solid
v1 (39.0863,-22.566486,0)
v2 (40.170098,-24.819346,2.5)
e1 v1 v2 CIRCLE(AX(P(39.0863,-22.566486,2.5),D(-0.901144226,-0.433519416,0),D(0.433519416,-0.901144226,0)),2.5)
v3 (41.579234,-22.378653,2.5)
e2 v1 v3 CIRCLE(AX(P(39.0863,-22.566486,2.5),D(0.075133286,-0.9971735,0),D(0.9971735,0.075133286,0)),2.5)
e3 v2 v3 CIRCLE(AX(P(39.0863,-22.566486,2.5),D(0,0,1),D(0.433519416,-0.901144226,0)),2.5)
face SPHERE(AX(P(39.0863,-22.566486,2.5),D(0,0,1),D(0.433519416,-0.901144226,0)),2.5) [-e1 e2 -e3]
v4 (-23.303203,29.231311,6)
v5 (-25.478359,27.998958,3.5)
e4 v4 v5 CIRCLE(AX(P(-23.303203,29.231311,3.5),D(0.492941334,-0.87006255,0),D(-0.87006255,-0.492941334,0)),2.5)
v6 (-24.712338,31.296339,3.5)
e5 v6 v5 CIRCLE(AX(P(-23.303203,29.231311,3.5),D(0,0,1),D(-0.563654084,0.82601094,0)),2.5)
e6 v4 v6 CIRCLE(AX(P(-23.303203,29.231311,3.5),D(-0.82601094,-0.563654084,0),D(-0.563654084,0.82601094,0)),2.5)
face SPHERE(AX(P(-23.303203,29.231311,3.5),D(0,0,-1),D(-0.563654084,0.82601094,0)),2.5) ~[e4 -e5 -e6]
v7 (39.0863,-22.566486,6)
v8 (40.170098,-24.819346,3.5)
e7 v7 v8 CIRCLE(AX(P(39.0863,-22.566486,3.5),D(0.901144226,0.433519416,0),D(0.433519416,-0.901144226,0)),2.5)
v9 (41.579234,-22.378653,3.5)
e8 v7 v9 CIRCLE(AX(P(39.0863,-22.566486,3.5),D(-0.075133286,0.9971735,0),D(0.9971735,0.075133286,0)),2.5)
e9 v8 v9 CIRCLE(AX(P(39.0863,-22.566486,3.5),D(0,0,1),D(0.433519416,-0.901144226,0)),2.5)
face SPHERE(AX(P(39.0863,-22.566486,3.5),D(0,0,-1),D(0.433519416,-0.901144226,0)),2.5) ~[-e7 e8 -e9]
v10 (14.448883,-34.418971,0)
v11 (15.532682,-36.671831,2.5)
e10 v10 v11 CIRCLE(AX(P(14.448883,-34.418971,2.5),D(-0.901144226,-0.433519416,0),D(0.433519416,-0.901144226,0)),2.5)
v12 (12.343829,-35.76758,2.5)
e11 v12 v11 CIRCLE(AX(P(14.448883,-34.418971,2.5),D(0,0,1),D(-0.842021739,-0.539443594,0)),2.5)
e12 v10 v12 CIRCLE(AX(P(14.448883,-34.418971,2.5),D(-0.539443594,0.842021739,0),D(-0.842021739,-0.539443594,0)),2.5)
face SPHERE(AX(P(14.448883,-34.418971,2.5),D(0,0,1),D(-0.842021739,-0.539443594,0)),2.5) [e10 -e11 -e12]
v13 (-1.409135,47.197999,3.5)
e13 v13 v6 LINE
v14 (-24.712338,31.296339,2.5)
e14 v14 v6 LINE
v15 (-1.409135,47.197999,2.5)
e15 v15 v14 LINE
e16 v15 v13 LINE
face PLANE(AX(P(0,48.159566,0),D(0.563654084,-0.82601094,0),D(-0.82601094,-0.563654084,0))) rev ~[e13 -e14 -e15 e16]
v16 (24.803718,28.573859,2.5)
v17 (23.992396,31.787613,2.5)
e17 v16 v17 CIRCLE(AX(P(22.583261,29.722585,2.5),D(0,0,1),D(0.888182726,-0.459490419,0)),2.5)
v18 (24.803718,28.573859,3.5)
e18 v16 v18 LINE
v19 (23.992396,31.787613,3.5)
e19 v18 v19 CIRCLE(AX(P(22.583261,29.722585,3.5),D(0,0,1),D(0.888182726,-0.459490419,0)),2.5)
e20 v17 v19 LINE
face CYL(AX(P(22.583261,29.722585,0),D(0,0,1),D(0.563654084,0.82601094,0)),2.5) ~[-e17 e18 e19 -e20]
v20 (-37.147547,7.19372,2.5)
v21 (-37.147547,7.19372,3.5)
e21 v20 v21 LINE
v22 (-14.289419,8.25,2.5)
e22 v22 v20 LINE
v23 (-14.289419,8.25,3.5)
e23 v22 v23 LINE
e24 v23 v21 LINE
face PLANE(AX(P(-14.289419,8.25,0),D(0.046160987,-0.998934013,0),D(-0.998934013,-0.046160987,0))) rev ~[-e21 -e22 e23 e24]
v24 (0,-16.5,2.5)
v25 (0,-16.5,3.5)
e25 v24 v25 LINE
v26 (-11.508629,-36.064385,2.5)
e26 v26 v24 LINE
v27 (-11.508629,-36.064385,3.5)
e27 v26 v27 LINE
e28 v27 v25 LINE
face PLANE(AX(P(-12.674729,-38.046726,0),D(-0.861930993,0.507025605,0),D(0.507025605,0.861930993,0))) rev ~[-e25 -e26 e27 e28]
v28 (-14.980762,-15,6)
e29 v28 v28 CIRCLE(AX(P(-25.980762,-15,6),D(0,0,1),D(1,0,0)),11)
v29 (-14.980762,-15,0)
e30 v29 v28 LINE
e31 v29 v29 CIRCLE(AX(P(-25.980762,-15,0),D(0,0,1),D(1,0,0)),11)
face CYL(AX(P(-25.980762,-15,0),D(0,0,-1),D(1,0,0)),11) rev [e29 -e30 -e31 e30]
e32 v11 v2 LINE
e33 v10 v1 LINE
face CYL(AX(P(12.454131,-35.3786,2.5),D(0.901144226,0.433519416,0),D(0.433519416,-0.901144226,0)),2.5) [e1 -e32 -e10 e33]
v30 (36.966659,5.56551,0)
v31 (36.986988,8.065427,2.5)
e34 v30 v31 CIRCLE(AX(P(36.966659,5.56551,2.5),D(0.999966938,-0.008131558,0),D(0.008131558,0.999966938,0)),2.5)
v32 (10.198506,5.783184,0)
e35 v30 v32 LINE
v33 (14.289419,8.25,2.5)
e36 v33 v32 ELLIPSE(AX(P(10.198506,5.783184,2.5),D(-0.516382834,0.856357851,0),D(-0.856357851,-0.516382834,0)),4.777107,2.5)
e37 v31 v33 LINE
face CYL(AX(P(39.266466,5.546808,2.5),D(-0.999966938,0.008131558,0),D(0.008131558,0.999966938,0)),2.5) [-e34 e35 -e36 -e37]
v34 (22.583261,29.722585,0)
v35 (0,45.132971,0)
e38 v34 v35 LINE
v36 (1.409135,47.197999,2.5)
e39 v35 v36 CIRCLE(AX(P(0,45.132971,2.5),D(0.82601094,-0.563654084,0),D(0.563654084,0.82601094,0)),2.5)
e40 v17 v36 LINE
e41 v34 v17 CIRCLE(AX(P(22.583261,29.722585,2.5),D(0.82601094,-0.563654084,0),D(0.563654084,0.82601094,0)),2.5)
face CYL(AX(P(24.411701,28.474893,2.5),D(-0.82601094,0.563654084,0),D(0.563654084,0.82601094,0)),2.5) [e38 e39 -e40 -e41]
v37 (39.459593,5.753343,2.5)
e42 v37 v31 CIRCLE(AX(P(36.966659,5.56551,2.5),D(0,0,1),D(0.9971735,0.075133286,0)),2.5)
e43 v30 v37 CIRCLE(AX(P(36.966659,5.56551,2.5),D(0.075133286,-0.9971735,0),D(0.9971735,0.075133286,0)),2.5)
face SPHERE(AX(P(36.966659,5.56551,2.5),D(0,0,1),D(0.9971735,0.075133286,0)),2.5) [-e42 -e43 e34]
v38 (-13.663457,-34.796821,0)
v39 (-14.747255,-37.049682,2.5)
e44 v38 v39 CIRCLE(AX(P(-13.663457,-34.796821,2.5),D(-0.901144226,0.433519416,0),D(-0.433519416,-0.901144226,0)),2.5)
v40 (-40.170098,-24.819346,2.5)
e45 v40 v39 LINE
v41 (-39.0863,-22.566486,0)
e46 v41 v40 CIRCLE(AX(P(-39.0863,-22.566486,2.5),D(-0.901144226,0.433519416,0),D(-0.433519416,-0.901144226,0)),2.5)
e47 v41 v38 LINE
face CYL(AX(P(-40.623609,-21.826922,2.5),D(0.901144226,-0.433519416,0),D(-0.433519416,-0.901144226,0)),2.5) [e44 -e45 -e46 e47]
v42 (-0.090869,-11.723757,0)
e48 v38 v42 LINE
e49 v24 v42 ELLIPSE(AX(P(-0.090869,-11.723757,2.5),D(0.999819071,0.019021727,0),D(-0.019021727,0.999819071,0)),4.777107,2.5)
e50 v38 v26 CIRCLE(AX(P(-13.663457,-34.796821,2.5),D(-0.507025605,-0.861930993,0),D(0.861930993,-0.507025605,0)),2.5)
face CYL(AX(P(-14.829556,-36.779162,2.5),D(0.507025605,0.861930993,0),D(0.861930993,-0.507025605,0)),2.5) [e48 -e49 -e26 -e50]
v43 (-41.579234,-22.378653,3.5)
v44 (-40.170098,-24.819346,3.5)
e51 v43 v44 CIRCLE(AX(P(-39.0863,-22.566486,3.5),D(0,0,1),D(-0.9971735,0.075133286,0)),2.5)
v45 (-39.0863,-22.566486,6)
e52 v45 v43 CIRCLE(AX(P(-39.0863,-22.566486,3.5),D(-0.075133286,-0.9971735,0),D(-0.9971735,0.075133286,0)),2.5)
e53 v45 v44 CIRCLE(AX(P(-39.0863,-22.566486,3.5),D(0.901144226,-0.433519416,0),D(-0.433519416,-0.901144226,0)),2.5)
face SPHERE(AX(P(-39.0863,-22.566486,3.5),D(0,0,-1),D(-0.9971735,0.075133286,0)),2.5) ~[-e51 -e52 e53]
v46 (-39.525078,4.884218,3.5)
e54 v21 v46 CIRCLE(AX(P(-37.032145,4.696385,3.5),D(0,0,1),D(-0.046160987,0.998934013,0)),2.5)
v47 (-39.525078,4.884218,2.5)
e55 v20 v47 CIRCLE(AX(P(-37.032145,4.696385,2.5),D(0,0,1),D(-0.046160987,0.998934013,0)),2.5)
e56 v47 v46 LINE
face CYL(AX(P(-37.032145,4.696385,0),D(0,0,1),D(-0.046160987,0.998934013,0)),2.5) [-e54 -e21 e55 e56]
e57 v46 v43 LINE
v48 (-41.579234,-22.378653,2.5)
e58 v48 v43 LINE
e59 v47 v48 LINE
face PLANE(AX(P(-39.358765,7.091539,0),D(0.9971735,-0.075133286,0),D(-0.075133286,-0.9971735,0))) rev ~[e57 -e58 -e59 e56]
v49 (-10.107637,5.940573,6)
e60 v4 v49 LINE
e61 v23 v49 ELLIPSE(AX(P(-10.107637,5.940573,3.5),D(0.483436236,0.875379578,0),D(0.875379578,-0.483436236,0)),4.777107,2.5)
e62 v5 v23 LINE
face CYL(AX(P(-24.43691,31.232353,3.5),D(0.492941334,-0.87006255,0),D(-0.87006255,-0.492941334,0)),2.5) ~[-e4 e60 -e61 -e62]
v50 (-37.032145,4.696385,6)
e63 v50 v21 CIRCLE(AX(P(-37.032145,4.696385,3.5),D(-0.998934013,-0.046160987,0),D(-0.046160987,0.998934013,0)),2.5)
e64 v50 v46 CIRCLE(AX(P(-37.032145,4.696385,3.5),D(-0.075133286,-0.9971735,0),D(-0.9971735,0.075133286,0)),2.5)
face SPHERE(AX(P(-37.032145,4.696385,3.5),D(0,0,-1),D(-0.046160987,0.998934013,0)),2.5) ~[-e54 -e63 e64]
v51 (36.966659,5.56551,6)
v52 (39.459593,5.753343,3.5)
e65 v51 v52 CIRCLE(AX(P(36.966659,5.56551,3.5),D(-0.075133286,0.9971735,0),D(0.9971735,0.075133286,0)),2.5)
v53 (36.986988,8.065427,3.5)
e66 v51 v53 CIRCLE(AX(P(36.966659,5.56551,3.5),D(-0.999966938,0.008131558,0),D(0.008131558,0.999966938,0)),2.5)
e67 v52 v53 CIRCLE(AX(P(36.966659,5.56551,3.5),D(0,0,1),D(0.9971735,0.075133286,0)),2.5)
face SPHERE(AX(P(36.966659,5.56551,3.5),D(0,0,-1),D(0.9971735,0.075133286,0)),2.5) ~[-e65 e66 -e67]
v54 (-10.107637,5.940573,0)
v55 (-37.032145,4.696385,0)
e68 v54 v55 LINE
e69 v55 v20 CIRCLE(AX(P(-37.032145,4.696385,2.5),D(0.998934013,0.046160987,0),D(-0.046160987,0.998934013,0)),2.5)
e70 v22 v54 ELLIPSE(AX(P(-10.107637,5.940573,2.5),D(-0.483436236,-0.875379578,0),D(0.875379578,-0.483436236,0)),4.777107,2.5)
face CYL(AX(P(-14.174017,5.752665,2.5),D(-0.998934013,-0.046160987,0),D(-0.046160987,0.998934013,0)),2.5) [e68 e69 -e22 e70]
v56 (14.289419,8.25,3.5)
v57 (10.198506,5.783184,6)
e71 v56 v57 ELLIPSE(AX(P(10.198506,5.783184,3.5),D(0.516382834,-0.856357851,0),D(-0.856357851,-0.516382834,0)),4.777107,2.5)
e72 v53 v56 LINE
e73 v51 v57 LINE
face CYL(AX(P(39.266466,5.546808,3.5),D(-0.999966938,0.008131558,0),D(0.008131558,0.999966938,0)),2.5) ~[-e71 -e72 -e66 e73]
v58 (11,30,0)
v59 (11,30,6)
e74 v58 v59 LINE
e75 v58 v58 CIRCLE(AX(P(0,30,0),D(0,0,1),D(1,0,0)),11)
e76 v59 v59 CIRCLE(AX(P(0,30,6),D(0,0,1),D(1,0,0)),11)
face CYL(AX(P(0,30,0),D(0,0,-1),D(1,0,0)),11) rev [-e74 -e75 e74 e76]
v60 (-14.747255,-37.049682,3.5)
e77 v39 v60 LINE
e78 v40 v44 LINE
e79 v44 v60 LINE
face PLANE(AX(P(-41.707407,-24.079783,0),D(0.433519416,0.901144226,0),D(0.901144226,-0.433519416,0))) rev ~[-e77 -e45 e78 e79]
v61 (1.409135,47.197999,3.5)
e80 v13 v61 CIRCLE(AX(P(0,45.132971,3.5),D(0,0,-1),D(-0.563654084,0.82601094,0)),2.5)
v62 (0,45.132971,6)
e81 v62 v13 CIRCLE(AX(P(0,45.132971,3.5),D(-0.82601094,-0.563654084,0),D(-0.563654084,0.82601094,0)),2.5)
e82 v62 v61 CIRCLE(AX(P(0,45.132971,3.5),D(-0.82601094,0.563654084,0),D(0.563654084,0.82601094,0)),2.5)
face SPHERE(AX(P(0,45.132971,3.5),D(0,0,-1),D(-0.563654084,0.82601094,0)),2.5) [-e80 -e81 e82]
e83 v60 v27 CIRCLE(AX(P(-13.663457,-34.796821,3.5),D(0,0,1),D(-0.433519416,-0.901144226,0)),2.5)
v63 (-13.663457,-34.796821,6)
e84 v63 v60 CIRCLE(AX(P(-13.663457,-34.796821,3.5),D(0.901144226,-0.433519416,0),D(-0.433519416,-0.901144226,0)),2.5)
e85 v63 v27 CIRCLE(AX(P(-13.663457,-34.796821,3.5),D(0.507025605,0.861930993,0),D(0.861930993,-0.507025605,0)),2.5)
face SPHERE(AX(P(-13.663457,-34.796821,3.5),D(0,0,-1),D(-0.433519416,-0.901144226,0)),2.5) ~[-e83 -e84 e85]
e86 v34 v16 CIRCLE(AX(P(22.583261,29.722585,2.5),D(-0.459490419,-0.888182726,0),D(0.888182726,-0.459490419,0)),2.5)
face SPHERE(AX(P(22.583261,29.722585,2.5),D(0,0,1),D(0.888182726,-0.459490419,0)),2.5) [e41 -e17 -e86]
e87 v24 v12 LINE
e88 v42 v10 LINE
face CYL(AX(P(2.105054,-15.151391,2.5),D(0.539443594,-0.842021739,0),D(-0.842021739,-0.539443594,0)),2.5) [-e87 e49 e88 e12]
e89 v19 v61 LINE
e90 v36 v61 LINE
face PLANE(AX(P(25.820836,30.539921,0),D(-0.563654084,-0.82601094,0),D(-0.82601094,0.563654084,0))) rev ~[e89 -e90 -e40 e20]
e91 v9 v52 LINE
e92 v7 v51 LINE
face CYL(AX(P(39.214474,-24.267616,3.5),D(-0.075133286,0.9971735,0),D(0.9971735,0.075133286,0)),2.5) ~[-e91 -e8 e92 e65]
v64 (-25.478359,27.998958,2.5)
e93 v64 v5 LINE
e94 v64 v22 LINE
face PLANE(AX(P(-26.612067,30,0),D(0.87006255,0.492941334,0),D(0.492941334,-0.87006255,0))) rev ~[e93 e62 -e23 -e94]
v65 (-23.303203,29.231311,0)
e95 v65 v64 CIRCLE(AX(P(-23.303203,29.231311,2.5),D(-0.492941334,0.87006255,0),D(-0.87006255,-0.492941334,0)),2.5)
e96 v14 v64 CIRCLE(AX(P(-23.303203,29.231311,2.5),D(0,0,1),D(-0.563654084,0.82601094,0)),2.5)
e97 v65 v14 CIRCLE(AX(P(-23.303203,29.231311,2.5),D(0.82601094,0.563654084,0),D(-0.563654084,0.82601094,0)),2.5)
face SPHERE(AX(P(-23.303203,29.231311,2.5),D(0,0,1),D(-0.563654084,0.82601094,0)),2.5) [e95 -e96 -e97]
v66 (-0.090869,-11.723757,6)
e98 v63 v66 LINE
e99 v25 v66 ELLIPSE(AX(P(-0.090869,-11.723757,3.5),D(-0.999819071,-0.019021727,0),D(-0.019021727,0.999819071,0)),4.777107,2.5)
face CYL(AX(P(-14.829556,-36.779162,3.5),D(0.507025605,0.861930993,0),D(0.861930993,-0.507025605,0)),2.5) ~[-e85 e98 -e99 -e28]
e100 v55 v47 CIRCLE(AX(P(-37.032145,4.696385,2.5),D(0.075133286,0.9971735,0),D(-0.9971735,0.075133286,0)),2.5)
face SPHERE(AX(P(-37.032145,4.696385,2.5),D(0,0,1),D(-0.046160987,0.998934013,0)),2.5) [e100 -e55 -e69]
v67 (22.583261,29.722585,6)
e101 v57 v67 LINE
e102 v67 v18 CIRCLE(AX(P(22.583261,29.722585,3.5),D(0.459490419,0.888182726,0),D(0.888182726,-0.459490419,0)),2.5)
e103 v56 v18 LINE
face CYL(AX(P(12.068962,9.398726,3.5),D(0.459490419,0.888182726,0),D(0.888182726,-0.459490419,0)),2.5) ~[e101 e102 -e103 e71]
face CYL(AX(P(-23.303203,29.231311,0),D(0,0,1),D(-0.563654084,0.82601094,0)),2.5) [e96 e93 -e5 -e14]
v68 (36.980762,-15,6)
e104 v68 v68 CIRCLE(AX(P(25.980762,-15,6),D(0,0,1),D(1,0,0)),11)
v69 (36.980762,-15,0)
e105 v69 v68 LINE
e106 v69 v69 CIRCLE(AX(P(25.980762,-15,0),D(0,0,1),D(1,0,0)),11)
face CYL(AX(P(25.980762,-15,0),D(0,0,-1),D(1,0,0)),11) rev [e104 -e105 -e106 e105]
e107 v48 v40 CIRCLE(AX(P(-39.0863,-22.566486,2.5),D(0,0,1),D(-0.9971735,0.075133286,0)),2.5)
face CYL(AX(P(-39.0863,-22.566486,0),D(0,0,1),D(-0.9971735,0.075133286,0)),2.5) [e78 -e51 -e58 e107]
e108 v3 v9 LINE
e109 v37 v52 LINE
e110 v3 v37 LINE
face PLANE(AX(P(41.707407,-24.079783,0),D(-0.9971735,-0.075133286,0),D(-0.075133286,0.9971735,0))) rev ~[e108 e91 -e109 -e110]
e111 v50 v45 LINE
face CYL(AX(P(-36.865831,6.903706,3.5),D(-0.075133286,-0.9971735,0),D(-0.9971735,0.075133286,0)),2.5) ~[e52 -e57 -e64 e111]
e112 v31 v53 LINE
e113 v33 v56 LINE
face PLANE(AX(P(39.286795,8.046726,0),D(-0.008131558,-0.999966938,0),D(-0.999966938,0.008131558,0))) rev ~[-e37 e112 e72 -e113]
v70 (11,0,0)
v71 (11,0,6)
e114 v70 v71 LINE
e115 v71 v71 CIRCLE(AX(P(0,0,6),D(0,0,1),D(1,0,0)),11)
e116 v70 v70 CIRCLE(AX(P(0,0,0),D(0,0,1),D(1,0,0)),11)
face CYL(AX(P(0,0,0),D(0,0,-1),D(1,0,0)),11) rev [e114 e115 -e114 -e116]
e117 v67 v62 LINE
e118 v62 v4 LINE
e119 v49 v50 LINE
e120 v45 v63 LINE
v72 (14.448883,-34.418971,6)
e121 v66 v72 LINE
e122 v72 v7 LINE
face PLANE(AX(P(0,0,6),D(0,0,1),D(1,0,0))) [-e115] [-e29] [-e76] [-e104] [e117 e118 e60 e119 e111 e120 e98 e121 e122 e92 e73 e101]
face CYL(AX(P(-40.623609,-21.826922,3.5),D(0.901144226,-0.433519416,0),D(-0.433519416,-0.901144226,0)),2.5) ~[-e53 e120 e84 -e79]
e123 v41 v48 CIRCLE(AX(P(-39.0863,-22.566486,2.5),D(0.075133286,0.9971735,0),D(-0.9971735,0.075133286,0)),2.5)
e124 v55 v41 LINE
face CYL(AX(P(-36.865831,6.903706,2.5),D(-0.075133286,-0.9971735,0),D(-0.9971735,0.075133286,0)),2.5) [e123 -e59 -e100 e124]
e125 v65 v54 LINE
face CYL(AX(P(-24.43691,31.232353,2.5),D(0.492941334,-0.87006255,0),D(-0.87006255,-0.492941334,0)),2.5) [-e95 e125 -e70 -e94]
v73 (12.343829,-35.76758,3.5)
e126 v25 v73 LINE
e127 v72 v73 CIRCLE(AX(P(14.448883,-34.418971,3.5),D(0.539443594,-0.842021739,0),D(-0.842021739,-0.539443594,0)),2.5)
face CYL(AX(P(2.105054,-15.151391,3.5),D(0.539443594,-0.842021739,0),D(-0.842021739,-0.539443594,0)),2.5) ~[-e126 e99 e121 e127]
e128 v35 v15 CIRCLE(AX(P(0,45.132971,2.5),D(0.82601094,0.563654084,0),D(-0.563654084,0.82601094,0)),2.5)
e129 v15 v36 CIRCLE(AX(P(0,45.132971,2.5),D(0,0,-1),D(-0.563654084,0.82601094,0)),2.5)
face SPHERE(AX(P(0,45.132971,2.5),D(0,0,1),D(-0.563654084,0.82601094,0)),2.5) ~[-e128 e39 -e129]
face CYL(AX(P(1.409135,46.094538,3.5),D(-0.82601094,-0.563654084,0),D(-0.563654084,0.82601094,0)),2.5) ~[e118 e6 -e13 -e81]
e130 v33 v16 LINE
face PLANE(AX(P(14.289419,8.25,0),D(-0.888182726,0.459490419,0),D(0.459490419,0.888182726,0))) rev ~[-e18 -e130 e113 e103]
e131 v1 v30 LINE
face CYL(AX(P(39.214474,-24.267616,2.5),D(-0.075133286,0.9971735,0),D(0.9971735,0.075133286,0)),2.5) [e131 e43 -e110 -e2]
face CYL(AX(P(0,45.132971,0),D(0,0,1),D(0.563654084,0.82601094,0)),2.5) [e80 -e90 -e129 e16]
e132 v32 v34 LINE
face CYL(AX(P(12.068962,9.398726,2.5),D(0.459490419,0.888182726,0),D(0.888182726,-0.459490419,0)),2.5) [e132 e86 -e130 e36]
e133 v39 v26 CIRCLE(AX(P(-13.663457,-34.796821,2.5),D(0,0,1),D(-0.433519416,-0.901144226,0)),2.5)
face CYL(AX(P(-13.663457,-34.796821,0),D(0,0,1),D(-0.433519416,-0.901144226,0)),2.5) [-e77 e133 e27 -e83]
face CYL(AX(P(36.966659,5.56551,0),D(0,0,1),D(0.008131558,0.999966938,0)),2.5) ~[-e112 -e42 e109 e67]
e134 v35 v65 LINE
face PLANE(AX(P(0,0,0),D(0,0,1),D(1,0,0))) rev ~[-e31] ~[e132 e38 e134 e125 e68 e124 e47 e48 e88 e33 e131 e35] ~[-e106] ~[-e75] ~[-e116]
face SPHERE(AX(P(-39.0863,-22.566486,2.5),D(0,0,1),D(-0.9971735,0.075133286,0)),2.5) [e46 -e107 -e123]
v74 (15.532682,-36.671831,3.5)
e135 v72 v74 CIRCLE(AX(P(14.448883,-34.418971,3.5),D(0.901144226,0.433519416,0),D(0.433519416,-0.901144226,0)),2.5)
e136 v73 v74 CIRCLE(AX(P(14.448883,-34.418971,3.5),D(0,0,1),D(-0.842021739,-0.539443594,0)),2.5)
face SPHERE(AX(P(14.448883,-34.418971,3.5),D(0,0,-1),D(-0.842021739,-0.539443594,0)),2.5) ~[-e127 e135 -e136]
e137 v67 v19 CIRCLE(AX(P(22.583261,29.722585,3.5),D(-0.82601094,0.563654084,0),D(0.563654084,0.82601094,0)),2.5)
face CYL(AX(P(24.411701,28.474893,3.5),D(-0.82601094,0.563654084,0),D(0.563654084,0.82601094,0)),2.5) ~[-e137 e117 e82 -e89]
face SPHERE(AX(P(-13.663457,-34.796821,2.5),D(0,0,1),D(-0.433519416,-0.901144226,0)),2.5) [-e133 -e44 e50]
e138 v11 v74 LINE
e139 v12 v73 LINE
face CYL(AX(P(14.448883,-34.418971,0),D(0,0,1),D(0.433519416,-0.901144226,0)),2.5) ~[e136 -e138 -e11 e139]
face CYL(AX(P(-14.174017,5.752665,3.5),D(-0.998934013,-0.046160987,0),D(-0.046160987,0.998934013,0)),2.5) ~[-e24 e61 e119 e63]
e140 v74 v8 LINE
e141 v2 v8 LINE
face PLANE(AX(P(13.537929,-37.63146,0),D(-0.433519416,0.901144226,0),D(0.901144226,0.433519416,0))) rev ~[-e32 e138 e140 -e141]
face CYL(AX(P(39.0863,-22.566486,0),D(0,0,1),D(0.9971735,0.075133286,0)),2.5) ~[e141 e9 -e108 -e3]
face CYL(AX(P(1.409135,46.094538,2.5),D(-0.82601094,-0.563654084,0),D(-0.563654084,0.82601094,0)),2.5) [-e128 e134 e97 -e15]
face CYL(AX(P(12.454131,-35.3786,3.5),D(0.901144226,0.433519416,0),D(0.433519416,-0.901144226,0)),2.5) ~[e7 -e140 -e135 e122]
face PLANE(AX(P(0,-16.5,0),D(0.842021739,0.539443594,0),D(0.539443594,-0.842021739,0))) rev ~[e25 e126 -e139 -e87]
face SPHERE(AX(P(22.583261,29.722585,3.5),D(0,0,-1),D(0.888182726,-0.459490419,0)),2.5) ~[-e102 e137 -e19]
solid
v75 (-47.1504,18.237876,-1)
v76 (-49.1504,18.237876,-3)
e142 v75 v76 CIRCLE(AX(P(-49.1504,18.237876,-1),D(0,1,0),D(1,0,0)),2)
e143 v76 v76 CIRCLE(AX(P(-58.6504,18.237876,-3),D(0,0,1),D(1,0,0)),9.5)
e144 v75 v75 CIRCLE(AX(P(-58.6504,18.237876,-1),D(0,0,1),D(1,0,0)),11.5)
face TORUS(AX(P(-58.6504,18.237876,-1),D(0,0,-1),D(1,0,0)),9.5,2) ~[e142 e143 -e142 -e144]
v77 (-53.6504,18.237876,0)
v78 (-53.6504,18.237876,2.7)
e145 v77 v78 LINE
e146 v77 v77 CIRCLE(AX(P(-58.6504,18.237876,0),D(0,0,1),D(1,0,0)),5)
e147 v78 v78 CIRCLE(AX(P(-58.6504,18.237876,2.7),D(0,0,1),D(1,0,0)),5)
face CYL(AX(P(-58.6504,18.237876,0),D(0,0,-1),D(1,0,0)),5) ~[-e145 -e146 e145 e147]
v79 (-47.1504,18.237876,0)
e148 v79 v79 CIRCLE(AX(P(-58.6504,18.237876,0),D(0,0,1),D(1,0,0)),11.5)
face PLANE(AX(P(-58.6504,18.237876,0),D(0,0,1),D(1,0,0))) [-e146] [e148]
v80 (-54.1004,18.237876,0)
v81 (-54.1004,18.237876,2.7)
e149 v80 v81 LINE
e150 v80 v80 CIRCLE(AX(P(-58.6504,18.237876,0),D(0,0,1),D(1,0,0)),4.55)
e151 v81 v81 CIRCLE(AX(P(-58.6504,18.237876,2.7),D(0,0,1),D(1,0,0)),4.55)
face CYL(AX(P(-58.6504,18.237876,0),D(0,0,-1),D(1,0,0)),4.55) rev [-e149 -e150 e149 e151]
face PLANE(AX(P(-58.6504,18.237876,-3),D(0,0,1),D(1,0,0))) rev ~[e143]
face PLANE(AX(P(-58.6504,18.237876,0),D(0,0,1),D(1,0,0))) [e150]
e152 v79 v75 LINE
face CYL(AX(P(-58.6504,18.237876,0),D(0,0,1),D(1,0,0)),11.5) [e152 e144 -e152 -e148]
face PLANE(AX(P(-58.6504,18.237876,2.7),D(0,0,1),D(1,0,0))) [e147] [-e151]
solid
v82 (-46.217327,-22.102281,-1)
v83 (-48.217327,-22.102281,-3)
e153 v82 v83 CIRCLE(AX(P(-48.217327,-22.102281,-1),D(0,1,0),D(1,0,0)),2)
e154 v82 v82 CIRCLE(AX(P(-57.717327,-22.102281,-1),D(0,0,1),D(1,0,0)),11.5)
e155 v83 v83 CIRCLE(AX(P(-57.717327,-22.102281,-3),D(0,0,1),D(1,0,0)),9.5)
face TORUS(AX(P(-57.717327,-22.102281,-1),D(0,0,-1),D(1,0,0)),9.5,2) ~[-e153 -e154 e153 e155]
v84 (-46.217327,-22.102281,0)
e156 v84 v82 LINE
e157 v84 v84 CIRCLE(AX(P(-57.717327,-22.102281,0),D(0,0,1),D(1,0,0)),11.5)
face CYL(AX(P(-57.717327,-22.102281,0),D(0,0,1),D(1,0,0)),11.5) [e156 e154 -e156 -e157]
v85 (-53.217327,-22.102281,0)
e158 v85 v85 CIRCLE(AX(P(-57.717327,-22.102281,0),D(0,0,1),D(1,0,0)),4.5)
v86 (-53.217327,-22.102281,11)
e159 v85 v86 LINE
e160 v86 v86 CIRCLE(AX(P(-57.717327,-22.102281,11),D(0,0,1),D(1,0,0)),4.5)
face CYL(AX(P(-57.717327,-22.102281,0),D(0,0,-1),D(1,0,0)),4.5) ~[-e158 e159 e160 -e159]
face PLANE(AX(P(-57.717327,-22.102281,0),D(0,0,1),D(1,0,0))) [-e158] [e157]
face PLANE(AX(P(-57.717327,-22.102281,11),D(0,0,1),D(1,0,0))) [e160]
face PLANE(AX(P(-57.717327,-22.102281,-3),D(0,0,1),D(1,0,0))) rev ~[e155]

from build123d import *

# Parameters (mm, degrees)
F0_R      = 11
F1_DEPTH  = 6
F2_R      = 2.5
F3_R      = 11.5
F3_R_2    = 4.5
F6_DEPTH  = 3
F7_DEPTH  = 11
F8_DEPTH  = 3
F9_R      = 5
F9_R_2    = 4.55
F10_DEPTH = 3
F9_R_3    = 11.5
F11_DEPTH = 3
F12_DEPTH = 3
F14_R     = 11.5
F14_R_2   = 4.5
F15_DEPTH = 3
F16_DEPTH = 11
F17_R     = 2
F19_R     = 11.5
F19_R_2   = 5
F19_R_3   = 4.55
F20_DEPTH = 3
F21_DEPTH = 2.7
F22_R     = 2


# Not quite as in the source:
# - a feature names something its author has since deleted; it is built from what else it names
# - the program builds the solid bodies; features that only make, move or delete a surface that nothing else refers to are left out


with BuildPart() as f1:
    # F0 (on Top) → F1 (new body)
    with BuildSketch(Plane.XY):
        Polygon((25.8208357735, 30.5399207623), (0, 48.1595657766), (-26.6120665459, 30), (-14.2894191624, 8.25), (-39.3587650965, 7.0915393457), (-41.7074073978, -24.0797828883), (-12.6747288406, -38.0467256759), (0, -16.5), (13.5379293229, -37.631460108), (41.7074073978, -24.0797828883), (39.2867953865, 8.0467256759), (14.2894191624, 8.25), align=None)
        with Locations((-25.9807621135, -15)):
            Circle(F0_R, mode=Mode.SUBTRACT)
        Circle(F0_R, mode=Mode.SUBTRACT)
        with Locations((25.9807621135, -15)):
            Circle(F0_R, mode=Mode.SUBTRACT)
        with Locations((0, 30)):
            Circle(F0_R, mode=Mode.SUBTRACT)
    extrude(amount=F1_DEPTH)

    # F2
    f2_edges = [f1.edges().sort_by_distance(p)[0] for p in [
        (-13.306033, 39.079783, 0),
        (-13.306033, 39.079783, 6),
        (-20.450743, 19.125, 0),
        (-20.450743, 19.125, 6),
        (-26.824092, 7.67077, 0),
        (-26.824092, 7.67077, 6),
        (-40.533086, -8.494122, 0),
        (-40.533086, -8.494122, 6),
        (-27.191068, -31.063254, 0),
        (-27.191068, -31.063254, 6),
        (-6.337364, -27.273363, 0),
        (-6.337364, -27.273363, 6),
        (6.768965, -27.06573, 6),
        (6.768965, -27.06573, 0),
        (27.622668, -30.855621, 0),
        (27.622668, -30.855621, 6),
        (40.497101, -8.016529, 0),
        (40.497101, -8.016529, 6),
        (26.788107, 8.148363, 6),
        (20.055127, 19.39496, 6),
        (26.788107, 8.148363, 0),
        (20.055127, 19.39496, 0),
        (12.910418, 39.349743, 6),
        (12.910418, 39.349743, 0),
        (-39.358765, 7.091539, 3),
        (-26.612067, 30, 3),
        (0, 48.159566, 3),
        (25.820836, 30.539921, 3),
        (39.286795, 8.046726, 3),
        (41.707407, -24.079783, 3),
        (13.537929, -37.63146, 3),
        (-12.674729, -38.046726, 3),
        (-41.707407, -24.079783, 3),
    ]]
    fillet(f2_edges, radius=F2_R)


with BuildPart() as f6:
    # F3 (on Top) → F6 (new body)
    with BuildSketch(Plane.XY):
        with Locations((-56.0110025108, 44.7937771678)):
            Circle(F3_R)
        with Locations((-56.0110025108, 44.7937771678)):
            Circle(F3_R_2, mode=Mode.SUBTRACT)
    extrude(amount=-F6_DEPTH)


with BuildPart() as f7:
    # F3 (on Top) → F7 (new body)
    with BuildSketch(Plane.XY):
        with Locations((-56.0110025108, 44.7937771678)):
            Circle(F3_R_2)
    extrude(amount=F7_DEPTH)


with BuildPart() as f8:
    # F3 (on Top) → F8 (new body)
    with BuildSketch(Plane.XY):
        with Locations((-56.0110025108, 44.7937771678)):
            Circle(F3_R_2)
    extrude(amount=-F8_DEPTH)


with BuildPart() as f10:
    # F9 (on Top) → F10 (new body)
    with BuildSketch(Plane.XY):
        with Locations((-57.440303266, 13.5914236307)):
            Circle(F9_R)
        with Locations((-57.440303266, 13.5914236307)):
            Circle(F9_R_2, mode=Mode.SUBTRACT)
    extrude(amount=F10_DEPTH)

    # F9 (on Top) → F12 (join)
    with BuildSketch(Plane.XY):
        with Locations((-57.440303266, 13.5914236307)):
            Circle(F9_R_2)
    extrude(amount=-F12_DEPTH)


with BuildPart() as f11:
    # F9 (on Top) → F11 (new body)
    with BuildSketch(Plane.XY):
        with Locations((-57.440303266, 13.5914236307)):
            Circle(F9_R_3)
        with Locations((-57.440303266, 13.5914236307)):
            Circle(F9_R, mode=Mode.SUBTRACT)
    extrude(amount=-F11_DEPTH)


with BuildPart() as f15:
    # F14 (on Top) → F15 (new body)
    with BuildSketch(Plane.XY):
        with Locations((-57.7173270285, -22.1022814512)):
            Circle(F14_R)
        with Locations((-57.7173270285, -22.1022814512)):
            Circle(F14_R_2, mode=Mode.SUBTRACT)
        with Locations((-57.7173270285, -22.1022814512)):
            Circle(F14_R_2)
    extrude(amount=-F15_DEPTH)

    # F14 (on Top) → F16 (join)
    with BuildSketch(Plane.XY):
        with Locations((-57.7173270285, -22.1022814512)):
            Circle(F14_R_2)
    extrude(amount=F16_DEPTH)

    # F17
    f17_edges = [f15.edges().sort_by_distance(p)[0] for p in [
        (-69.217327, -22.102281, -3),
    ]]
    fillet(f17_edges, radius=F17_R)


with BuildPart() as f20:
    # F19 (on Top) → F20 (new body)
    with BuildSketch(Plane.XY):
        with Locations((-58.6504004896, 18.2378757745)):
            Circle(F19_R)
        with Locations((-58.6504004896, 18.2378757745)):
            Circle(F19_R_2, mode=Mode.SUBTRACT)
        with Locations((-58.6504004896, 18.2378757745)):
            Circle(F19_R_2)
        with Locations((-58.6504004896, 18.2378757745)):
            Circle(F19_R_3, mode=Mode.SUBTRACT)
        with Locations((-58.6504004896, 18.2378757745)):
            Circle(F19_R_3)
    extrude(amount=-F20_DEPTH)

    # F19 (on Top) → F21 (join)
    with BuildSketch(Plane.XY):
        with Locations((-58.6504004896, 18.2378757745)):
            Circle(F19_R_2)
        with Locations((-58.6504004896, 18.2378757745)):
            Circle(F19_R_3, mode=Mode.SUBTRACT)
    extrude(amount=F21_DEPTH)

    # F22
    f22_edges = [f20.edges().sort_by_distance(p)[0] for p in [
        (-70.1504, 18.237876, -3),
    ]]
    fillet(f22_edges, radius=F22_R)


solid = Compound([f1.part, f15.part, f20.part])
